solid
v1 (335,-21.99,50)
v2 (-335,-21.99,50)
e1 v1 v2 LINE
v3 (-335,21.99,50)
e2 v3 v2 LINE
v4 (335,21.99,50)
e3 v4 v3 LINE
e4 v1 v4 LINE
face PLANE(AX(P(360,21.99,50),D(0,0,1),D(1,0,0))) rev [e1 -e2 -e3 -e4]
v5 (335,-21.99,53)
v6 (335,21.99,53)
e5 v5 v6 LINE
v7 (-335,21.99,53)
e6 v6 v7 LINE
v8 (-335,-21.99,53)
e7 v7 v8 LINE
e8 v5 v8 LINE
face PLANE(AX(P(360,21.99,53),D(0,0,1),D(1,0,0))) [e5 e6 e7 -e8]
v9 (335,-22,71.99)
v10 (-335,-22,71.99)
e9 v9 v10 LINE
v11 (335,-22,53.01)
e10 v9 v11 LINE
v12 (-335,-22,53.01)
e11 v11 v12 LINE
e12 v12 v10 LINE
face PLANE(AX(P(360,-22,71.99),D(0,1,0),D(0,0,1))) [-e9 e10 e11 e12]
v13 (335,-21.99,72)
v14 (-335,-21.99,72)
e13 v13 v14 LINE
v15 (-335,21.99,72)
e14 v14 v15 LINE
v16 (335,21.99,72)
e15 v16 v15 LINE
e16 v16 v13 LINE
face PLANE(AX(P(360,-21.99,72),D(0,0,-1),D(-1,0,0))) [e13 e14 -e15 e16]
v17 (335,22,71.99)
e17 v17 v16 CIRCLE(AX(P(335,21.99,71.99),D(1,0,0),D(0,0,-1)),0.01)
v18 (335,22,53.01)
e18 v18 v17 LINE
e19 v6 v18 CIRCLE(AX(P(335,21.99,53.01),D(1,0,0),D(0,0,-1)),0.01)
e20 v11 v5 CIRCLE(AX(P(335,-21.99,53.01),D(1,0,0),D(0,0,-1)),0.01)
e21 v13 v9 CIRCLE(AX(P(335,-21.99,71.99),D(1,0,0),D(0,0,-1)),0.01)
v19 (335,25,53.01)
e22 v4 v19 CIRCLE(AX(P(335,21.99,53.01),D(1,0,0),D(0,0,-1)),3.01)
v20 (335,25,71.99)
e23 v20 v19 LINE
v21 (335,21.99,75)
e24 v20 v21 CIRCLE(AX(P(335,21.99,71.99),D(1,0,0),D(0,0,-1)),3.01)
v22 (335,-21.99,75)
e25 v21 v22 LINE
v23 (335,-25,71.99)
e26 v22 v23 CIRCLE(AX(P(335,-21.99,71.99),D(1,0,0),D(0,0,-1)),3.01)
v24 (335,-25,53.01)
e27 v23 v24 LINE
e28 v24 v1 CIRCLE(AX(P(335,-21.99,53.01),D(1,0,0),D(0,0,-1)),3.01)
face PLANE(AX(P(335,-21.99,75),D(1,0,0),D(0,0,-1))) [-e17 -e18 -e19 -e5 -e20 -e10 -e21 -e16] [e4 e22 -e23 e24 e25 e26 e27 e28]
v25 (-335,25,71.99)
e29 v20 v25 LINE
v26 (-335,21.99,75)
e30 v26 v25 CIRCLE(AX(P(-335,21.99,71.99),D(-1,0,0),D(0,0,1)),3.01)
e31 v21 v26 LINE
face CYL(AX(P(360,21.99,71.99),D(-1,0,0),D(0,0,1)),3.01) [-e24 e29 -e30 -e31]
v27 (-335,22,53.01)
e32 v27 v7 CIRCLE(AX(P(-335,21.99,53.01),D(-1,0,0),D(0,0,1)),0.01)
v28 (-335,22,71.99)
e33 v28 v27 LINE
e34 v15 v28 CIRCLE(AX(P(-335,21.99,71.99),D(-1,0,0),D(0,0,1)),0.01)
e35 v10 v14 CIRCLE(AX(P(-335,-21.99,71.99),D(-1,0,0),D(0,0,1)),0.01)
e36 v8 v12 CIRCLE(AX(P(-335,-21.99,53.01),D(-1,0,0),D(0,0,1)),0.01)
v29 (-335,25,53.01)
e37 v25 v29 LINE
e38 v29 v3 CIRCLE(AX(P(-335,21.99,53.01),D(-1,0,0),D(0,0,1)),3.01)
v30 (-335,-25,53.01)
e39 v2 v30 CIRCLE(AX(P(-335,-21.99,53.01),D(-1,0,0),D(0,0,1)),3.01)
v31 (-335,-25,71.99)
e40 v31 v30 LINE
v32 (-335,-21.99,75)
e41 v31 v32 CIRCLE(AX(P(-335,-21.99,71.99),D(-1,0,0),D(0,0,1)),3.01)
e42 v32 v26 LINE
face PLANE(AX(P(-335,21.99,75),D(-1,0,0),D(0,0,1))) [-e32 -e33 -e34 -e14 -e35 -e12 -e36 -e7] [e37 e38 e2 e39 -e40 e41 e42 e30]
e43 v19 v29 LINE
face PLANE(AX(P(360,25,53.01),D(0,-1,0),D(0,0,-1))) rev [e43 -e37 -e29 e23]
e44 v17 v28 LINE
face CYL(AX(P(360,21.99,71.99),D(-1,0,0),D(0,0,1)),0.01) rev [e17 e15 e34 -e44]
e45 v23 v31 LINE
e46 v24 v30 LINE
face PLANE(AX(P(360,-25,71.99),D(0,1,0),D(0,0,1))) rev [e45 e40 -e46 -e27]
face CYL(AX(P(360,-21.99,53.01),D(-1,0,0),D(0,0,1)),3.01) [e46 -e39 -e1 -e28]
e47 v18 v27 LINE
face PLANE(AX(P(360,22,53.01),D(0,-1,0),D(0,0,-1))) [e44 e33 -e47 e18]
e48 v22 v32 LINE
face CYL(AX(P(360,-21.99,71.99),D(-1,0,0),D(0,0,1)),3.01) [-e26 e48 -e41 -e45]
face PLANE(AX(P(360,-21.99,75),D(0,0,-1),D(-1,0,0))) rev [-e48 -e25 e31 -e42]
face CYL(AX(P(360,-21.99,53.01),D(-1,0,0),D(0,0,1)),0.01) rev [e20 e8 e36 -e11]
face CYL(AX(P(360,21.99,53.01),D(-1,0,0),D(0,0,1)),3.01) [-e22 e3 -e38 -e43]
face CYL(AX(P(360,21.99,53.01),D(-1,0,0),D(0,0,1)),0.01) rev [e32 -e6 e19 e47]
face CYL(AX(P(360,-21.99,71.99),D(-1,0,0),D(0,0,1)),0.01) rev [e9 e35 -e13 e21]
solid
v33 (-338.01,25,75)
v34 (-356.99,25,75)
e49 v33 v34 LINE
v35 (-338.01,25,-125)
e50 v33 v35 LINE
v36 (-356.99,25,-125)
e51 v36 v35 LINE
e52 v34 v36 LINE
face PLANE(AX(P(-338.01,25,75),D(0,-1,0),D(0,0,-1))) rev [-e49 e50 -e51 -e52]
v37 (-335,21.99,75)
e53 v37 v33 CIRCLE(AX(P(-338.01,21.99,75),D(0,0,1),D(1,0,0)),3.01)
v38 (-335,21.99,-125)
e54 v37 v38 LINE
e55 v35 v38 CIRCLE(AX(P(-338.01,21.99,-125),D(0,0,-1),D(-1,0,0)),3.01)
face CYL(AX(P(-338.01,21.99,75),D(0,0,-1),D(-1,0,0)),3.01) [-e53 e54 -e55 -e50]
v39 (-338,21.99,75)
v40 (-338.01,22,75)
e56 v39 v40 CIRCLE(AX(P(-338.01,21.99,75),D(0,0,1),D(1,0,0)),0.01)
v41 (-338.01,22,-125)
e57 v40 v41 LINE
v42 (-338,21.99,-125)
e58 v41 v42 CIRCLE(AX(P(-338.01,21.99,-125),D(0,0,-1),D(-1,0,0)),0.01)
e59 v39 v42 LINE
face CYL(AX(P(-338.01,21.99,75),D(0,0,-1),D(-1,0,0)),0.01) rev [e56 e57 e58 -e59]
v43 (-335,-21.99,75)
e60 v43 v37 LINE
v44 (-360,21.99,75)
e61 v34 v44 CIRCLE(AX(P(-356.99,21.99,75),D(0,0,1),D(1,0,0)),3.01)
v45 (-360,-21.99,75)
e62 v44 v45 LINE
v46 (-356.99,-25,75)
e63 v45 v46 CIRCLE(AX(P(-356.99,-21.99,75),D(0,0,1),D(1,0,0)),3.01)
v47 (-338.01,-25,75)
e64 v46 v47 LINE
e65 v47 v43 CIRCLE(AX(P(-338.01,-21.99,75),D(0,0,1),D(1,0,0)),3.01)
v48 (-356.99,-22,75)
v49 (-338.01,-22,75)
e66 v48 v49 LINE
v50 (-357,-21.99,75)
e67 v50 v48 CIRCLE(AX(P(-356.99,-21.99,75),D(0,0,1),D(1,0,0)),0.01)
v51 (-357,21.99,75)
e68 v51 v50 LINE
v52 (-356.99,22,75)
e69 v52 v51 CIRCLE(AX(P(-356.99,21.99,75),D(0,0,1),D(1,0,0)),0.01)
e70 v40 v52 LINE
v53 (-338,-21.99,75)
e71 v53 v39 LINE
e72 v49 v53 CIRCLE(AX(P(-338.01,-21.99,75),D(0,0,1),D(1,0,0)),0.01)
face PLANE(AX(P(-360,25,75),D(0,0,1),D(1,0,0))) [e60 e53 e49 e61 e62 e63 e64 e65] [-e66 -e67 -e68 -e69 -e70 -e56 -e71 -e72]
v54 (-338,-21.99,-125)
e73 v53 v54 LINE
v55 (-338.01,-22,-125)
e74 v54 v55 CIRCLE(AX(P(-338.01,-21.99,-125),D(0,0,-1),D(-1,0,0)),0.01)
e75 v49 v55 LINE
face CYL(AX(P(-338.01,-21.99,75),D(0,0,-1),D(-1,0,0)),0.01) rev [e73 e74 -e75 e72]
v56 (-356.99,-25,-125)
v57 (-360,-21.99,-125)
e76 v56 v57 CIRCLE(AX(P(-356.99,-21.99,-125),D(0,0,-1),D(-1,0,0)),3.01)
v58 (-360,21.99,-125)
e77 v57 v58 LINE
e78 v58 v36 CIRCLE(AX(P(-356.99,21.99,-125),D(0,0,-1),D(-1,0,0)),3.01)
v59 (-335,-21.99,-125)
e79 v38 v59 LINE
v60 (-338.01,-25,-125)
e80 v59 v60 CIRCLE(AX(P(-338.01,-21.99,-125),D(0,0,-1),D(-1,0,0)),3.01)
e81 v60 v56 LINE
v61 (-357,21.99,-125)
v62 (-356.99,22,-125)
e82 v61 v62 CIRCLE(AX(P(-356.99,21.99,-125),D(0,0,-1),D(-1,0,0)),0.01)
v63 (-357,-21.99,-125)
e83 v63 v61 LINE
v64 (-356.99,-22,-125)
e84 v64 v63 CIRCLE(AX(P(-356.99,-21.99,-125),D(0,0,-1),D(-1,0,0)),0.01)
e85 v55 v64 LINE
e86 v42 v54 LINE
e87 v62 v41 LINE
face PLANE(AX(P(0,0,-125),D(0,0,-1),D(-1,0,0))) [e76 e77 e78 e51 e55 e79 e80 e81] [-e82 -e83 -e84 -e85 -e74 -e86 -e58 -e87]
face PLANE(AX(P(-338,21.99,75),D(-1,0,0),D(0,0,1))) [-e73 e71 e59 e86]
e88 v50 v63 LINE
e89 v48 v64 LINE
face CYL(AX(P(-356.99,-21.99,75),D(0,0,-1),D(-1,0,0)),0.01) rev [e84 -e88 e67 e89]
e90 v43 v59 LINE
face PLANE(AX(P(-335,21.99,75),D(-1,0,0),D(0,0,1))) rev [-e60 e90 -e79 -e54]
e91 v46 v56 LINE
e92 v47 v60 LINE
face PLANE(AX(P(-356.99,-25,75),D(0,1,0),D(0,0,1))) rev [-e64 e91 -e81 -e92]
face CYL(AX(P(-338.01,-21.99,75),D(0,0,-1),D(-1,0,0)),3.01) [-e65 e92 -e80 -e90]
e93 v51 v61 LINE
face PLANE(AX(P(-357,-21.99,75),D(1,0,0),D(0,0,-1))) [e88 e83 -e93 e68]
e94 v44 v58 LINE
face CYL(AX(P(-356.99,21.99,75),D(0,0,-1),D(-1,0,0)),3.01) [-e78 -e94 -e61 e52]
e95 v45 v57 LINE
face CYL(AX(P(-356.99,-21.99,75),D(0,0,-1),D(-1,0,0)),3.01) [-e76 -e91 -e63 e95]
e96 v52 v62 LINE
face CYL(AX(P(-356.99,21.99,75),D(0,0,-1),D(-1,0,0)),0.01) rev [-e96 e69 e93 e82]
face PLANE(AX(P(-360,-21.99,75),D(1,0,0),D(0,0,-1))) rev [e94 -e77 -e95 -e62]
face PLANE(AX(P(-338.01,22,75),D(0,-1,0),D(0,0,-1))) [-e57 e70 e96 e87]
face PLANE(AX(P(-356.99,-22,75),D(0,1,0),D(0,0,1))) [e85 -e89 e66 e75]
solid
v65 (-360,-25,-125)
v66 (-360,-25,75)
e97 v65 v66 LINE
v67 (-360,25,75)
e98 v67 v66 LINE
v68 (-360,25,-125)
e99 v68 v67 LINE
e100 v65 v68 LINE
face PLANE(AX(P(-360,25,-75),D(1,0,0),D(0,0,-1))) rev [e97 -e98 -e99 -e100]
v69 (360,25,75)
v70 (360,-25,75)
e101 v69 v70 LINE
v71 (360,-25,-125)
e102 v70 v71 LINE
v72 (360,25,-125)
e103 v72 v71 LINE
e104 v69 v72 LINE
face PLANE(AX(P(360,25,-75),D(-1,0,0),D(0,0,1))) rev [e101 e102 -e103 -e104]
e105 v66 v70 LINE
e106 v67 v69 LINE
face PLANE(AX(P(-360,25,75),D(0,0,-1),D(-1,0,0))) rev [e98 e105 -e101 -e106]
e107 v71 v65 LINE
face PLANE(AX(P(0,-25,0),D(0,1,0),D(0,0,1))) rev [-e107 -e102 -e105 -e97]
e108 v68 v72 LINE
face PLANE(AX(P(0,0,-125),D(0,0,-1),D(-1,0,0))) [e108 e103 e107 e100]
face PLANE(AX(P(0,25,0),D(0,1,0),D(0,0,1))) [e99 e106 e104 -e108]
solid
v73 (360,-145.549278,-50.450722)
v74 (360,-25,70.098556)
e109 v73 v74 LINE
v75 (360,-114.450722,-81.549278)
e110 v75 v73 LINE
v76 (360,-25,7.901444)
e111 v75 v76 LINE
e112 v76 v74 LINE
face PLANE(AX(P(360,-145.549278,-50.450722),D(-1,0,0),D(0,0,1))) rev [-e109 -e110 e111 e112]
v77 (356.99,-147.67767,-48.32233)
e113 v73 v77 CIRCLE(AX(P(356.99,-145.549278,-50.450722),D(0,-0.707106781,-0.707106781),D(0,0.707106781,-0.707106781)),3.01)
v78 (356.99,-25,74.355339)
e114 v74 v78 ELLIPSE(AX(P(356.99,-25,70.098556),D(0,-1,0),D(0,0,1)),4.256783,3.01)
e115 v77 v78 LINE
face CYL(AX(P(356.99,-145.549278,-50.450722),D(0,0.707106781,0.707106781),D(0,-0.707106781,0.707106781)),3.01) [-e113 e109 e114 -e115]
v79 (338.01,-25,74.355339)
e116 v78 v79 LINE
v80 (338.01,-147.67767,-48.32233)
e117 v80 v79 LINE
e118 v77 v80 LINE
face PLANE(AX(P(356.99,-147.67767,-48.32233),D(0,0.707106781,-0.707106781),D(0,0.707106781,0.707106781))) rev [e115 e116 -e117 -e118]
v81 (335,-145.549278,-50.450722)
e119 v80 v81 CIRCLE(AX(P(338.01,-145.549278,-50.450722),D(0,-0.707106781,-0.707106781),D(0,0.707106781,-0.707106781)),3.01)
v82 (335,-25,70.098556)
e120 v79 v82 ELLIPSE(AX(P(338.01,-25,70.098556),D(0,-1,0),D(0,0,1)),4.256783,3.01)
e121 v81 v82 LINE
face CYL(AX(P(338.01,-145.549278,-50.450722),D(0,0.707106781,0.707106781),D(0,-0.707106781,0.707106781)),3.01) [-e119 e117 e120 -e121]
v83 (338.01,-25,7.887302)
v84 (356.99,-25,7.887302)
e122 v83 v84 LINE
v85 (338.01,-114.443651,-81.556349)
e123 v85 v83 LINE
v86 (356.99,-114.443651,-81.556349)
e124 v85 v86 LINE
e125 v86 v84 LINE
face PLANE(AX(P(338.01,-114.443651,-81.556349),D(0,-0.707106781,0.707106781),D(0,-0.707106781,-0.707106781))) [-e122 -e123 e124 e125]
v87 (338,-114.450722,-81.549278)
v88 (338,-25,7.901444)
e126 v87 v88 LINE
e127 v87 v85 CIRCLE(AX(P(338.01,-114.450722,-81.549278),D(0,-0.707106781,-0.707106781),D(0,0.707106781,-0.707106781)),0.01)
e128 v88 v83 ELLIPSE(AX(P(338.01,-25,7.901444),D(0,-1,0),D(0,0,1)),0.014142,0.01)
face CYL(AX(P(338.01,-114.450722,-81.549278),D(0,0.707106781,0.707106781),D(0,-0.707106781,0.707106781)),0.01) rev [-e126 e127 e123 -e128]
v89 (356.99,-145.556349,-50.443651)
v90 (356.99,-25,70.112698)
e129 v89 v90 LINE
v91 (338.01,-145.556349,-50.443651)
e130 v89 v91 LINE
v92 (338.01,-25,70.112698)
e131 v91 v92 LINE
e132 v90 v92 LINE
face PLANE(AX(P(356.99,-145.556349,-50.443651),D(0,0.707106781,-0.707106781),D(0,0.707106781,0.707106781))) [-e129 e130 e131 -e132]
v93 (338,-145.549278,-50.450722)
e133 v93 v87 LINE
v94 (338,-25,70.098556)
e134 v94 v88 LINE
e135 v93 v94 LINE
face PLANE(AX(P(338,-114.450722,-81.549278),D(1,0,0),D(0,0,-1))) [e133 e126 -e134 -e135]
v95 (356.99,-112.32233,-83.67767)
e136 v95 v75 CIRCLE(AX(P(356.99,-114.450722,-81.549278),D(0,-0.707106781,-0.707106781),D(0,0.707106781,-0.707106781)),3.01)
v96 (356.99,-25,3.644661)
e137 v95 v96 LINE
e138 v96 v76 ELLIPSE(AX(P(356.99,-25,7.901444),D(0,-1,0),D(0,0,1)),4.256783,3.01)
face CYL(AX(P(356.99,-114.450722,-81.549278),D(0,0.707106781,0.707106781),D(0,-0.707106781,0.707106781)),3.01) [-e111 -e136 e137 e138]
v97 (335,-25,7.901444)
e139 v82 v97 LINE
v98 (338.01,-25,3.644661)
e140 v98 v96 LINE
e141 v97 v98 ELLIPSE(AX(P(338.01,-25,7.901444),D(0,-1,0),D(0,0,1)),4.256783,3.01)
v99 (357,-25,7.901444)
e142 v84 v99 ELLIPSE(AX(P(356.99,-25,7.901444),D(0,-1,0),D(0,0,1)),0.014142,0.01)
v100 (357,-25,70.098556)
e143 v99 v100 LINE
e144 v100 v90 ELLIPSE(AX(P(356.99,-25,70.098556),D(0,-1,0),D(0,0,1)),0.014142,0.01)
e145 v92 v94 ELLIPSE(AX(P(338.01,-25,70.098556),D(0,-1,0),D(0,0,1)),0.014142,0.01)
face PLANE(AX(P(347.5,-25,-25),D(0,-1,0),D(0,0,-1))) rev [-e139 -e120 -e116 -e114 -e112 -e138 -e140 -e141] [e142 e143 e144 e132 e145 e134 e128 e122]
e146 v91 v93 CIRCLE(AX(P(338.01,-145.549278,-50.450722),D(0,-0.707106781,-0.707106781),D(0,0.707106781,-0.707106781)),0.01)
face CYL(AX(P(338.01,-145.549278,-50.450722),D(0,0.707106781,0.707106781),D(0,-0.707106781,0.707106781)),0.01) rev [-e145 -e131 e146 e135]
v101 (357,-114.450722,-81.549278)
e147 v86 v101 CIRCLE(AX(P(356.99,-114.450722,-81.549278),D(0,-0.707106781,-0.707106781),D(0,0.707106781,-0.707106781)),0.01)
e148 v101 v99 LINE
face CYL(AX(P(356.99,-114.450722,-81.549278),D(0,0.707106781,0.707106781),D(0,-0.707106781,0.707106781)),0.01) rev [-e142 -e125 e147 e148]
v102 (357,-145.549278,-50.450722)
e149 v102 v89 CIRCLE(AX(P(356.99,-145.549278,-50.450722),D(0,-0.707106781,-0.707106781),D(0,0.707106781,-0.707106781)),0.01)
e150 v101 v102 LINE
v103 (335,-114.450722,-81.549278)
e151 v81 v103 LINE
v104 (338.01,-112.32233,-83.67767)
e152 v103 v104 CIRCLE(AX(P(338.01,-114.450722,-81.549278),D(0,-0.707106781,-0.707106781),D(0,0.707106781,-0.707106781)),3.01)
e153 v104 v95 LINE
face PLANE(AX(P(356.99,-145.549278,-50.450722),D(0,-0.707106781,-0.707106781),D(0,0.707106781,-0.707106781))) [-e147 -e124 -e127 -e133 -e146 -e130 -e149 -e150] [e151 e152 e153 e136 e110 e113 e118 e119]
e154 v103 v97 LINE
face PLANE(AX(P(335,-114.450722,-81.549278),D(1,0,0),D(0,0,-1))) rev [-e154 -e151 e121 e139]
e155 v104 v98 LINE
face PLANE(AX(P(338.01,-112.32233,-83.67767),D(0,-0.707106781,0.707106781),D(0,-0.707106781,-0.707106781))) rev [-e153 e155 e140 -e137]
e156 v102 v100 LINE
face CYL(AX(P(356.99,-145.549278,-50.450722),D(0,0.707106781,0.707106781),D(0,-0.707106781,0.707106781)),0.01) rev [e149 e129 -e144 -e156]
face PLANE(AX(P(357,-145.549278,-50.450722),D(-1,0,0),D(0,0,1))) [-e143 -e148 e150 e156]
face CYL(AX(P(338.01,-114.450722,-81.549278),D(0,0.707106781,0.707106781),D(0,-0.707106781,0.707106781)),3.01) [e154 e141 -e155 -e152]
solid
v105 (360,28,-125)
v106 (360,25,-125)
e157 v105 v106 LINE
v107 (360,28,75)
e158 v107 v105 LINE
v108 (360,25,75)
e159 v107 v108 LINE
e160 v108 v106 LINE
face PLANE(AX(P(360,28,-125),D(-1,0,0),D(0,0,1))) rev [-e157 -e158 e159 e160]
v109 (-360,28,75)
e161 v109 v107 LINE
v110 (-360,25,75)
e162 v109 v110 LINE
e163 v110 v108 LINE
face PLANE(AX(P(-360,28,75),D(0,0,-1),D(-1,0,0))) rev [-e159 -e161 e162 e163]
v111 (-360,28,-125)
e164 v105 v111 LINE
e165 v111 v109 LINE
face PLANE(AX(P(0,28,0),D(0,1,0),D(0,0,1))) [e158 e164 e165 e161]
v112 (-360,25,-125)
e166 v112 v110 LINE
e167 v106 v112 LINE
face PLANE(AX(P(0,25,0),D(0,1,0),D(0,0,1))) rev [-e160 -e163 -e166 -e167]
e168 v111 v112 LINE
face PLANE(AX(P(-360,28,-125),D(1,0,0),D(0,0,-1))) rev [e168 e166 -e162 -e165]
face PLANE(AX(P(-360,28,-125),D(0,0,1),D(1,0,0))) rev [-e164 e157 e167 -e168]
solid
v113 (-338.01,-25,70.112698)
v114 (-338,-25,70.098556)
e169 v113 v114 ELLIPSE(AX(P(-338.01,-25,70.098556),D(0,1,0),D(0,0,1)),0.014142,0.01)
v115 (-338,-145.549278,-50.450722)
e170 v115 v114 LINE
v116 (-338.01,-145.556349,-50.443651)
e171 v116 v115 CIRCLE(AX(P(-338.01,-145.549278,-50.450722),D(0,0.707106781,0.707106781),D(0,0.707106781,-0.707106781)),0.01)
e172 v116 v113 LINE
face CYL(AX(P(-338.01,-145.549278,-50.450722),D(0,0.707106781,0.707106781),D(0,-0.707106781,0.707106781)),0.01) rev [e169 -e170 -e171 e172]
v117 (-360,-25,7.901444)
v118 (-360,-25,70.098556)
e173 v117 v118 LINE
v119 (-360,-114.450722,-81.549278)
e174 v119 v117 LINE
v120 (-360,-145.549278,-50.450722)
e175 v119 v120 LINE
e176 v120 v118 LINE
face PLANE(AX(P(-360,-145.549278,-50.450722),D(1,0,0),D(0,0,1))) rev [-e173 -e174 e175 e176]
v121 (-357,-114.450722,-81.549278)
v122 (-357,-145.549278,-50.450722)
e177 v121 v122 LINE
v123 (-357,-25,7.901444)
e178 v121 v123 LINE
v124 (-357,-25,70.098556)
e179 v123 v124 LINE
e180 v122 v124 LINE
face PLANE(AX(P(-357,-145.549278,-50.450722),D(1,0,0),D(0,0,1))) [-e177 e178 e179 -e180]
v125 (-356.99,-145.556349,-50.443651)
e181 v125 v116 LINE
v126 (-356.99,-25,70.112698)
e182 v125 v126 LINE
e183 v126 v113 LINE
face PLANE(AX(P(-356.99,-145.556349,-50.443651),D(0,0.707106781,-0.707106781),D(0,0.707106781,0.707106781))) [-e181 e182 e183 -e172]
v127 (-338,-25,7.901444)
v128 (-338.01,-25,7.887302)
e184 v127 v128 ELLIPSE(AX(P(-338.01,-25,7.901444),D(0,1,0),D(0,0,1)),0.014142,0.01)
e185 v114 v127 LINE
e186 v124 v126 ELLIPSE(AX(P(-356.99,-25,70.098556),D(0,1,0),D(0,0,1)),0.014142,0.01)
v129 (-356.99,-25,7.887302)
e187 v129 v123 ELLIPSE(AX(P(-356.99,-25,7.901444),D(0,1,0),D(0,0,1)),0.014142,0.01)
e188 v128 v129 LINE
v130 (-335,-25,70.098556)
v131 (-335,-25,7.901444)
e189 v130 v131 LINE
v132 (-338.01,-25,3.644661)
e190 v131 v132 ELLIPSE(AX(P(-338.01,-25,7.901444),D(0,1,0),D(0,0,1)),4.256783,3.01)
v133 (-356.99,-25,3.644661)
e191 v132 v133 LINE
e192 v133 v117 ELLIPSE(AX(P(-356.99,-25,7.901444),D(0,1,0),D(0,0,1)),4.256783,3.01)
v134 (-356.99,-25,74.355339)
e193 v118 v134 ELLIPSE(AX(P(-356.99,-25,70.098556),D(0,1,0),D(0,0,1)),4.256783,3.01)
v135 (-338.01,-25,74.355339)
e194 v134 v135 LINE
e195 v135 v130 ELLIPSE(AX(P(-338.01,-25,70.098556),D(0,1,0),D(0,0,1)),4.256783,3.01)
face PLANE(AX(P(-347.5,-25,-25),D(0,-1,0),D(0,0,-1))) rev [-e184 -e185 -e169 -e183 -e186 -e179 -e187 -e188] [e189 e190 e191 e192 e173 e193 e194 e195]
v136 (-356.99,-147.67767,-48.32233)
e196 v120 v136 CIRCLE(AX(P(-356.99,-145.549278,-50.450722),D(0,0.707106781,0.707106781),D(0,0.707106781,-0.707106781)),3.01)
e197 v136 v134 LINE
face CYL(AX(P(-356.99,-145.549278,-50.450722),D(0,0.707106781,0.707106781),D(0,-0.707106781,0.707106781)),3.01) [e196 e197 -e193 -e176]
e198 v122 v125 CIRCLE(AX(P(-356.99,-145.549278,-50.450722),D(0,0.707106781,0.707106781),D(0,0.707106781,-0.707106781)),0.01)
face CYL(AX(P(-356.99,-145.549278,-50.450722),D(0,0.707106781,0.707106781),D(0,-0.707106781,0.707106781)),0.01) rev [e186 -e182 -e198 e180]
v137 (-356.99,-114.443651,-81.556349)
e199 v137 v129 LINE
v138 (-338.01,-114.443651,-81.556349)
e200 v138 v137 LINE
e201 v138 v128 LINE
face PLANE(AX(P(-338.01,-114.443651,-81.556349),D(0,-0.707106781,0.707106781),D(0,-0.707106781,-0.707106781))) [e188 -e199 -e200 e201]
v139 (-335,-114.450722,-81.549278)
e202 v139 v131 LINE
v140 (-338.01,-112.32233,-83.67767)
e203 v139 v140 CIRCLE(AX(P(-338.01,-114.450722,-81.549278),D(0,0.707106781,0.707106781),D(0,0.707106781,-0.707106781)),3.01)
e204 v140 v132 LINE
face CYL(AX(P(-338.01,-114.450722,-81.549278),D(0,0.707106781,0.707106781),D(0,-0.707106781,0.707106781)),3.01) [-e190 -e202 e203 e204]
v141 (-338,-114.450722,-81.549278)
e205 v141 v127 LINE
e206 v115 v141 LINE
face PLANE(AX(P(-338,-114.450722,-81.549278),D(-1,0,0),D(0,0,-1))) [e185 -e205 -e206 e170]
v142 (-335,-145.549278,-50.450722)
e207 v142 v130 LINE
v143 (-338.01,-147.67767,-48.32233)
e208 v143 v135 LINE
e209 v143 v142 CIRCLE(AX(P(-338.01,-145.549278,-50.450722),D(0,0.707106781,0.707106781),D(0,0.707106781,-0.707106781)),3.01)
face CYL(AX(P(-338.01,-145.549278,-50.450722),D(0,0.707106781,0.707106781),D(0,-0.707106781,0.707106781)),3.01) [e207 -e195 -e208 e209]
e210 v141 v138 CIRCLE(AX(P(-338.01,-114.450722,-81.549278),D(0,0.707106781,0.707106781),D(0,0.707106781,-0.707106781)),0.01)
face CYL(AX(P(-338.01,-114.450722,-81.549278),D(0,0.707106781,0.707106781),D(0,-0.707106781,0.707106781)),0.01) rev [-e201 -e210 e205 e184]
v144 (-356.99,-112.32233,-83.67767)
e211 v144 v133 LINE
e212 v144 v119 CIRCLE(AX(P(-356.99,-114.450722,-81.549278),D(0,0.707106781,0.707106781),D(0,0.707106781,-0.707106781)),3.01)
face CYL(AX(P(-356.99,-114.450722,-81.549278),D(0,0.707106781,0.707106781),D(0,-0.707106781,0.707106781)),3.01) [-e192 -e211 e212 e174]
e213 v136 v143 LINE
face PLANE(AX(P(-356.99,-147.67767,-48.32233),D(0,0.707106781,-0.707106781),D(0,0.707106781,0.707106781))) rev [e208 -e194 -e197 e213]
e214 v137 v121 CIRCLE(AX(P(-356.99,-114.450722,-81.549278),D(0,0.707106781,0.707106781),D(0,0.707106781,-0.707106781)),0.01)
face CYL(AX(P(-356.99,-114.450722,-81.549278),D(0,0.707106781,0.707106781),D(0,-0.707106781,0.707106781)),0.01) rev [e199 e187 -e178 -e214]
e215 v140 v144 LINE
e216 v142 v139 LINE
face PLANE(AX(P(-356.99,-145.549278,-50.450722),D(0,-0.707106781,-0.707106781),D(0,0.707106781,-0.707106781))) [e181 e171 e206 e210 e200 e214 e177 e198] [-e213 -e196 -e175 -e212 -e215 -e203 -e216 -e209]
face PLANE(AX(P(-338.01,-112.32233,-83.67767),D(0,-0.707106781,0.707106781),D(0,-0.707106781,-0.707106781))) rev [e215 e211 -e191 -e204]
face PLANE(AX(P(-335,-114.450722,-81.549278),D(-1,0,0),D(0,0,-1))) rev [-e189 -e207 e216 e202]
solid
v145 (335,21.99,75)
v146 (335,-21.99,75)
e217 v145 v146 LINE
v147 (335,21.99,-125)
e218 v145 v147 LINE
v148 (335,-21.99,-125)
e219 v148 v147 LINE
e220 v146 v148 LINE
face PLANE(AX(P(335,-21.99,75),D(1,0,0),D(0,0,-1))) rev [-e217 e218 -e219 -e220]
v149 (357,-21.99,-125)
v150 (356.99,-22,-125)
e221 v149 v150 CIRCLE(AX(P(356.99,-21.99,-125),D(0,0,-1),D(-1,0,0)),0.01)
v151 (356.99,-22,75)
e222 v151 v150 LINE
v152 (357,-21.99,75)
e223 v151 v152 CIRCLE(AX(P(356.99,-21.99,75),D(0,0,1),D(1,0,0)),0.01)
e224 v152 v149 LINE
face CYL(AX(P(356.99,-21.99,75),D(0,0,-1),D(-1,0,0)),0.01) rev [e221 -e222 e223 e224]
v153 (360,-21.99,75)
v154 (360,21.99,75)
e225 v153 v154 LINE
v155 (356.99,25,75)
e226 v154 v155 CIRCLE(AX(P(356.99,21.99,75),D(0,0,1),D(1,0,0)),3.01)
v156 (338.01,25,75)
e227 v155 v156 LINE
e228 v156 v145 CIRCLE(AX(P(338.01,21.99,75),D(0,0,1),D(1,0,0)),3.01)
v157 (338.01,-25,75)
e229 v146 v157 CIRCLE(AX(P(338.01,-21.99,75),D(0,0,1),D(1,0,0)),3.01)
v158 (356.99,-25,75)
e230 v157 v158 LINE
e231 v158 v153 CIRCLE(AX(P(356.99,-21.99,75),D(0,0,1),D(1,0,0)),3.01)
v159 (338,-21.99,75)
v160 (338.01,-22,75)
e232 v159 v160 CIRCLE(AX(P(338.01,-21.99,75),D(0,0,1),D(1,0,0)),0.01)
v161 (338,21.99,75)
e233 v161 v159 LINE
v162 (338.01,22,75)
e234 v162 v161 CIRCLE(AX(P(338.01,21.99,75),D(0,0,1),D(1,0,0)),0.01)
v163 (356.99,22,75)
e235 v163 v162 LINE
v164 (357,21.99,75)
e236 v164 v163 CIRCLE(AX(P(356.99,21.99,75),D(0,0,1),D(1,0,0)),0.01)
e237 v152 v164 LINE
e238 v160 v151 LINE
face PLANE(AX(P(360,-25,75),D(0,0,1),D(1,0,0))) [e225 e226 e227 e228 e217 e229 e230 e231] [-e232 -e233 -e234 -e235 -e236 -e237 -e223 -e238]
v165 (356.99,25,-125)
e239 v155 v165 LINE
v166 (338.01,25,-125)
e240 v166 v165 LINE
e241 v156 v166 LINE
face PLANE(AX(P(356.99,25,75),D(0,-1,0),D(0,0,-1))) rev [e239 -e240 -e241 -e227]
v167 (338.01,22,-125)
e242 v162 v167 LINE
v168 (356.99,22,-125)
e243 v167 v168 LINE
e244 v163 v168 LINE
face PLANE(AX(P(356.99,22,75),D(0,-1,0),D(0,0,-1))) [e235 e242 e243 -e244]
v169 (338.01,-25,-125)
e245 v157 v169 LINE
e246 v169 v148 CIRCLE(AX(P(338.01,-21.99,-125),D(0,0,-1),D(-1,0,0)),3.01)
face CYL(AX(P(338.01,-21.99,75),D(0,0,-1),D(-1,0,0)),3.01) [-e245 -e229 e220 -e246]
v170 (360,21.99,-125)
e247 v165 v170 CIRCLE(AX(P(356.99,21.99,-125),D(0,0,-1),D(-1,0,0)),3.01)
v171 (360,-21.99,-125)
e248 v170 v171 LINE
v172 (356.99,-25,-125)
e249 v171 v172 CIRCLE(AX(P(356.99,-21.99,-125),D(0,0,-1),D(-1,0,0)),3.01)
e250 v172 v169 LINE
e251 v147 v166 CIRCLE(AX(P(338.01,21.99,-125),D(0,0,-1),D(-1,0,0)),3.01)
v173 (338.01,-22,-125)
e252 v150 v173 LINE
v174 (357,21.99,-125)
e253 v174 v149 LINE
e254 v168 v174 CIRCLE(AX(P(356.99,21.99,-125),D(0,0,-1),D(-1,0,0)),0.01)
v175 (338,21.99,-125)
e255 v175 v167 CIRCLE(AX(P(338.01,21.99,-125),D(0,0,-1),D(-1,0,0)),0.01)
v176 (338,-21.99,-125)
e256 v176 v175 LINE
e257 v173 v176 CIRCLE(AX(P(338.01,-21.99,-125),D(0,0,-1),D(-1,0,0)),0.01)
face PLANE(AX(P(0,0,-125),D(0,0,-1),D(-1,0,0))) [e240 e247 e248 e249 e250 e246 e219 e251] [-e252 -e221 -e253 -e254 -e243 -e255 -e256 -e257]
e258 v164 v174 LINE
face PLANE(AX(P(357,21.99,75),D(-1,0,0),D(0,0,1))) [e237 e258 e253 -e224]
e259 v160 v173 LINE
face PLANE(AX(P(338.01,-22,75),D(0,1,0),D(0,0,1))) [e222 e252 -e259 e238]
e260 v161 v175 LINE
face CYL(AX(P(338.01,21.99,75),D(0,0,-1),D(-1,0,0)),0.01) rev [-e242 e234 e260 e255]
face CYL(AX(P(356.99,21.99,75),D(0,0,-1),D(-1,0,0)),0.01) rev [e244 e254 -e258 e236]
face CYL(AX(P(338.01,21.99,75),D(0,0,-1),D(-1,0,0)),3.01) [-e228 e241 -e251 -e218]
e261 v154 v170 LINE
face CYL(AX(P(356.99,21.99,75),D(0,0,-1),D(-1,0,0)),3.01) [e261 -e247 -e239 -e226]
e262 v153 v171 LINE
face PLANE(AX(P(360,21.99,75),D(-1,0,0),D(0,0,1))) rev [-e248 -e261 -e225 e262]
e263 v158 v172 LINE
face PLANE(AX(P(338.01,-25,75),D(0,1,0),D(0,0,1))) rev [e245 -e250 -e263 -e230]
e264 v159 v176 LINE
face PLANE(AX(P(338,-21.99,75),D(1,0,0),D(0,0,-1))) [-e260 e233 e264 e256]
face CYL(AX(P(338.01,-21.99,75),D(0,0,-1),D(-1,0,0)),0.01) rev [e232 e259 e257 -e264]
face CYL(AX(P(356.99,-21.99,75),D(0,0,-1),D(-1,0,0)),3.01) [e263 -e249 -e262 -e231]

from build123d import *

# Parameters (mm, degrees)
SKETCH_1_W              = 720
SKETCH_1_H              = 150
EXTRUDE_1_DEPTH         = 25
SKETCH_2_W              = 720
SKETCH_2_H              = 50
EXTRUDE_2_DEPTH         = 50
F_50_START              = -335
F_50_X_25_X_3_1_DEPTH   = 670
F_50_START_2            = -75
F_50_X_25_X_3_1_2_DEPTH = 150
F_50_X_25_X_3_1_3_DEPTH = 150
BODY_START              = -75
BODY_4_RUN_ON_DEPTH     = 50
BODY_3_RUN_ON_DEPTH     = 50
SKETCH_5_W              = 720
SKETCH_5_H              = 200
EXTRUDE_3_DEPTH         = 3
F_50_X_25_X_3_2_DEPTH   = 183.847763109


# Read off the part's stored shape, not the designer's step: Прямоугольная труба 50 X 25 X 3(1), Отсечь/Удлинить2
with BuildPart() as part:
    # Эскиз1 → Бобышка-Вытянуть1 (new, symmetric)
    with BuildSketch(Plane(origin=(0, 0, 0), x_dir=(1, 0, 0), z_dir=(0, 1, 0))):
        Rectangle(SKETCH_1_W, SKETCH_1_H)
    extrude(amount=EXTRUDE_1_DEPTH, both=True)

    # Эскиз2 → Бобышка-Вытянуть2 (add)
    with BuildSketch(Plane(origin=(0, 0, -75), x_dir=(-1, 0, 0), z_dir=(0, 0, -1))):
        Rectangle(SKETCH_2_W, SKETCH_2_H)
    extrude(amount=EXTRUDE_2_DEPTH)


with BuildPart() as body_2:
    # Прямоугольная труба 50 X 25 X 3(1) outline → Прямоугольная труба 50 X 25 X 3(1) (new body)
    with BuildSketch(Plane.YZ.offset(F_50_START)):
        with BuildLine():
            Line((-21.99, 50), (21.99, 50))
            ThreePointArc((21.99, 50), (24.118391411, 50.881608589), (25, 53.01))
            Line((25, 53.01), (25, 71.99))
            ThreePointArc((25, 71.99), (24.118391411, 74.118391411), (21.99, 75))
            Line((21.99, 75), (-21.99, 75))
            ThreePointArc((-21.99, 75), (-24.118391411, 74.118391411), (-25, 71.99))
            Line((-25, 71.99), (-25, 53.01))
            ThreePointArc((-25, 53.01), (-24.118391411, 50.881608589), (-21.99, 50))
        make_face()
        with BuildLine():
            ThreePointArc((-22, 71.99), (-21.997071068, 71.997071068), (-21.99, 72))
            Line((-21.99, 72), (21.99, 72))
            ThreePointArc((21.99, 72), (21.997071068, 71.997071068), (22, 71.99))
            Line((22, 71.99), (22, 53.01))
            ThreePointArc((22, 53.01), (21.997071068, 53.002928932), (21.99, 53))
            Line((21.99, 53), (-21.99, 53))
            ThreePointArc((-21.99, 53), (-21.997071068, 53.002928932), (-22, 53.01))
            Line((-22, 53.01), (-22, 71.99))
        make_face(mode=Mode.SUBTRACT)
    extrude(amount=F_50_X_25_X_3_1_DEPTH)


with BuildPart() as body_3:
    # 50 X 25 X 3_1 2 outline → 50 X 25 X 3_1 2 (new body)
    with BuildSketch(Plane.XY.offset(F_50_START_2)):
        with BuildLine():
            ThreePointArc((360, 21.99), (359.118391411, 24.118391411), (356.99, 25))
            Line((356.99, 25), (338.01, 25))
            ThreePointArc((338.01, 25), (335.881608589, 24.118391411), (335, 21.99))
            Line((335, 21.99), (335, -21.99))
            ThreePointArc((335, -21.99), (335.881608589, -24.118391411), (338.01, -25))
            Line((338.01, -25), (356.99, -25))
            ThreePointArc((356.99, -25), (359.118391411, -24.118391411), (360, -21.99))
            Line((360, -21.99), (360, 21.99))
        make_face()
        with BuildLine():
            Line((338, -21.99), (338, 21.99))
            ThreePointArc((338, 21.99), (338.002928932, 21.997071068), (338.01, 22))
            Line((338.01, 22), (356.99, 22))
            ThreePointArc((356.99, 22), (356.997071068, 21.997071068), (357, 21.99))
            Line((357, 21.99), (357, -21.99))
            ThreePointArc((357, -21.99), (356.997071068, -21.997071068), (356.99, -22))
            Line((356.99, -22), (338.01, -22))
            ThreePointArc((338.01, -22), (338.002928932, -21.997071068), (338, -21.99))
        make_face(mode=Mode.SUBTRACT)
    extrude(amount=F_50_X_25_X_3_1_2_DEPTH)

    # 50 X 25 X 3_1 2 outline → body 3 run on (add)
    with BuildSketch(Plane.XY.offset(BODY_START)):
        with BuildLine():
            ThreePointArc((360, 21.99), (359.118391411, 24.118391411), (356.99, 25))
            Line((356.99, 25), (338.01, 25))
            ThreePointArc((338.01, 25), (335.881608589, 24.118391411), (335, 21.99))
            Line((335, 21.99), (335, -21.99))
            ThreePointArc((335, -21.99), (335.881608589, -24.118391411), (338.01, -25))
            Line((338.01, -25), (356.99, -25))
            ThreePointArc((356.99, -25), (359.118391411, -24.118391411), (360, -21.99))
            Line((360, -21.99), (360, 21.99))
        make_face()
        with BuildLine():
            Line((338, -21.99), (338, 21.99))
            ThreePointArc((338, 21.99), (338.002928932, 21.997071068), (338.01, 22))
            Line((338.01, 22), (356.99, 22))
            ThreePointArc((356.99, 22), (356.997071068, 21.997071068), (357, 21.99))
            Line((357, 21.99), (357, -21.99))
            ThreePointArc((357, -21.99), (356.997071068, -21.997071068), (356.99, -22))
            Line((356.99, -22), (338.01, -22))
            ThreePointArc((338.01, -22), (338.002928932, -21.997071068), (338, -21.99))
        make_face(mode=Mode.SUBTRACT)
    extrude(amount=-BODY_3_RUN_ON_DEPTH)


with BuildPart() as body_4:
    # 50 X 25 X 3_1 3 outline → 50 X 25 X 3_1 3 (new body)
    with BuildSketch(Plane.XY.offset(F_50_START_2)):
        with BuildLine():
            ThreePointArc((-335, 21.99), (-335.881608589, 24.118391411), (-338.01, 25))
            Line((-338.01, 25), (-356.99, 25))
            ThreePointArc((-356.99, 25), (-359.118391411, 24.118391411), (-360, 21.99))
            Line((-360, 21.99), (-360, -21.99))
            ThreePointArc((-360, -21.99), (-359.118391411, -24.118391411), (-356.99, -25))
            Line((-356.99, -25), (-338.01, -25))
            ThreePointArc((-338.01, -25), (-335.881608589, -24.118391411), (-335, -21.99))
            Line((-335, -21.99), (-335, 21.99))
        make_face()
        with BuildLine():
            Line((-357, -21.99), (-357, 21.99))
            ThreePointArc((-357, 21.99), (-356.997071068, 21.997071068), (-356.99, 22))
            Line((-356.99, 22), (-338.01, 22))
            ThreePointArc((-338.01, 22), (-338.002928932, 21.997071068), (-338, 21.99))
            Line((-338, 21.99), (-338, -21.99))
            ThreePointArc((-338, -21.99), (-338.002928932, -21.997071068), (-338.01, -22))
            Line((-338.01, -22), (-356.99, -22))
            ThreePointArc((-356.99, -22), (-356.997071068, -21.997071068), (-357, -21.99))
        make_face(mode=Mode.SUBTRACT)
    extrude(amount=F_50_X_25_X_3_1_3_DEPTH)

    # 50 X 25 X 3_1 3 outline → body 4 run on (add)
    with BuildSketch(Plane.XY.offset(BODY_START)):
        with BuildLine():
            ThreePointArc((-335, 21.99), (-335.881608589, 24.118391411), (-338.01, 25))
            Line((-338.01, 25), (-356.99, 25))
            ThreePointArc((-356.99, 25), (-359.118391411, 24.118391411), (-360, 21.99))
            Line((-360, 21.99), (-360, -21.99))
            ThreePointArc((-360, -21.99), (-359.118391411, -24.118391411), (-356.99, -25))
            Line((-356.99, -25), (-338.01, -25))
            ThreePointArc((-338.01, -25), (-335.881608589, -24.118391411), (-335, -21.99))
            Line((-335, -21.99), (-335, 21.99))
        make_face()
        with BuildLine():
            Line((-357, -21.99), (-357, 21.99))
            ThreePointArc((-357, 21.99), (-356.997071068, 21.997071068), (-356.99, 22))
            Line((-356.99, 22), (-338.01, 22))
            ThreePointArc((-338.01, 22), (-338.002928932, 21.997071068), (-338, 21.99))
            Line((-338, 21.99), (-338, -21.99))
            ThreePointArc((-338, -21.99), (-338.002928932, -21.997071068), (-338.01, -22))
            Line((-338.01, -22), (-356.99, -22))
            ThreePointArc((-356.99, -22), (-356.997071068, -21.997071068), (-357, -21.99))
        make_face(mode=Mode.SUBTRACT)
    extrude(amount=-BODY_4_RUN_ON_DEPTH)


with BuildPart() as body_5:
    # Эскиз5 → Бобышка-Вытянуть3 (new body)
    with BuildSketch(Plane(origin=(0, 25, 0), x_dir=(1, 0, 0), z_dir=(0, 1, 0))):
        with Locations((0, 25)):
            Rectangle(SKETCH_5_W, SKETCH_5_H)
    extrude(amount=EXTRUDE_3_DEPTH)


with BuildPart() as body_6:
    # Sketch11 → Прямоугольная труба 50 X 25 X 3(2) (new body)
    with BuildSketch(Plane(origin=(347.5, 0, 64), x_dir=(1, 0, 0), z_dir=(0, -0.7071067811865487, -0.7071067811865465))):
        with BuildLine():
            Line((-9.49, -25), (9.49, -25))
            ThreePointArc((9.49, -25), (11.618391411, -24.118391411), (12.5, -21.99))
            Line((12.5, -21.99), (12.5, 21.99))
            ThreePointArc((12.5, 21.99), (11.618391411, 24.118391411), (9.49, 25))
            Line((9.49, 25), (-9.49, 25))
            ThreePointArc((-9.49, 25), (-11.618391411, 24.118391411), (-12.5, 21.99))
            Line((-12.5, 21.99), (-12.5, -21.99))
            ThreePointArc((-12.5, -21.99), (-11.618391411, -24.118391411), (-9.49, -25))
        make_face()
        with BuildLine():
            Line((-9.49, -22), (9.49, -22))
            ThreePointArc((9.49, -22), (9.497071068, -21.997071068), (9.5, -21.99))
            Line((9.5, -21.99), (9.5, 21.99))
            ThreePointArc((9.5, 21.99), (9.497071068, 21.997071068), (9.49, 22))
            Line((9.49, 22), (-9.49, 22))
            ThreePointArc((-9.49, 22), (-9.497071068, 21.997071068), (-9.5, 21.99))
            Line((-9.5, 21.99), (-9.5, -21.99))
            ThreePointArc((-9.5, -21.99), (-9.497071068, -21.997071068), (-9.49, -22))
        make_face(mode=Mode.SUBTRACT)
    extrude(amount=F_50_X_25_X_3_2_DEPTH)


with BuildPart() as body_7:
    # Weld Trim 2: the piece on the far side of the plane
    add(body_6.part)
    split(bisect_by=Plane(origin=(0, -25, 0), x_dir=(1, 0, 0), z_dir=(0, 1, 0)), keep=Keep.BOTTOM)


with BuildPart() as body_6_1:
    add(body_6.part)

    # Weld Trim 2
    split(bisect_by=Plane(origin=(0, -25, 0), x_dir=(1, 0, 0), z_dir=(0, 1, 0)), keep=Keep.TOP)


with BuildPart() as body_7_2:
    # Зеркальное отражение1: mirrored copy
    add(body_7.part.mirror(Plane(origin=(0, 0, 0), x_dir=(0, 0, 1), z_dir=(1, 0, 0))))


solid = Compound([part.part, body_2.part, body_3.part, body_4.part, body_5.part, body_7.part, body_7_2.part])
